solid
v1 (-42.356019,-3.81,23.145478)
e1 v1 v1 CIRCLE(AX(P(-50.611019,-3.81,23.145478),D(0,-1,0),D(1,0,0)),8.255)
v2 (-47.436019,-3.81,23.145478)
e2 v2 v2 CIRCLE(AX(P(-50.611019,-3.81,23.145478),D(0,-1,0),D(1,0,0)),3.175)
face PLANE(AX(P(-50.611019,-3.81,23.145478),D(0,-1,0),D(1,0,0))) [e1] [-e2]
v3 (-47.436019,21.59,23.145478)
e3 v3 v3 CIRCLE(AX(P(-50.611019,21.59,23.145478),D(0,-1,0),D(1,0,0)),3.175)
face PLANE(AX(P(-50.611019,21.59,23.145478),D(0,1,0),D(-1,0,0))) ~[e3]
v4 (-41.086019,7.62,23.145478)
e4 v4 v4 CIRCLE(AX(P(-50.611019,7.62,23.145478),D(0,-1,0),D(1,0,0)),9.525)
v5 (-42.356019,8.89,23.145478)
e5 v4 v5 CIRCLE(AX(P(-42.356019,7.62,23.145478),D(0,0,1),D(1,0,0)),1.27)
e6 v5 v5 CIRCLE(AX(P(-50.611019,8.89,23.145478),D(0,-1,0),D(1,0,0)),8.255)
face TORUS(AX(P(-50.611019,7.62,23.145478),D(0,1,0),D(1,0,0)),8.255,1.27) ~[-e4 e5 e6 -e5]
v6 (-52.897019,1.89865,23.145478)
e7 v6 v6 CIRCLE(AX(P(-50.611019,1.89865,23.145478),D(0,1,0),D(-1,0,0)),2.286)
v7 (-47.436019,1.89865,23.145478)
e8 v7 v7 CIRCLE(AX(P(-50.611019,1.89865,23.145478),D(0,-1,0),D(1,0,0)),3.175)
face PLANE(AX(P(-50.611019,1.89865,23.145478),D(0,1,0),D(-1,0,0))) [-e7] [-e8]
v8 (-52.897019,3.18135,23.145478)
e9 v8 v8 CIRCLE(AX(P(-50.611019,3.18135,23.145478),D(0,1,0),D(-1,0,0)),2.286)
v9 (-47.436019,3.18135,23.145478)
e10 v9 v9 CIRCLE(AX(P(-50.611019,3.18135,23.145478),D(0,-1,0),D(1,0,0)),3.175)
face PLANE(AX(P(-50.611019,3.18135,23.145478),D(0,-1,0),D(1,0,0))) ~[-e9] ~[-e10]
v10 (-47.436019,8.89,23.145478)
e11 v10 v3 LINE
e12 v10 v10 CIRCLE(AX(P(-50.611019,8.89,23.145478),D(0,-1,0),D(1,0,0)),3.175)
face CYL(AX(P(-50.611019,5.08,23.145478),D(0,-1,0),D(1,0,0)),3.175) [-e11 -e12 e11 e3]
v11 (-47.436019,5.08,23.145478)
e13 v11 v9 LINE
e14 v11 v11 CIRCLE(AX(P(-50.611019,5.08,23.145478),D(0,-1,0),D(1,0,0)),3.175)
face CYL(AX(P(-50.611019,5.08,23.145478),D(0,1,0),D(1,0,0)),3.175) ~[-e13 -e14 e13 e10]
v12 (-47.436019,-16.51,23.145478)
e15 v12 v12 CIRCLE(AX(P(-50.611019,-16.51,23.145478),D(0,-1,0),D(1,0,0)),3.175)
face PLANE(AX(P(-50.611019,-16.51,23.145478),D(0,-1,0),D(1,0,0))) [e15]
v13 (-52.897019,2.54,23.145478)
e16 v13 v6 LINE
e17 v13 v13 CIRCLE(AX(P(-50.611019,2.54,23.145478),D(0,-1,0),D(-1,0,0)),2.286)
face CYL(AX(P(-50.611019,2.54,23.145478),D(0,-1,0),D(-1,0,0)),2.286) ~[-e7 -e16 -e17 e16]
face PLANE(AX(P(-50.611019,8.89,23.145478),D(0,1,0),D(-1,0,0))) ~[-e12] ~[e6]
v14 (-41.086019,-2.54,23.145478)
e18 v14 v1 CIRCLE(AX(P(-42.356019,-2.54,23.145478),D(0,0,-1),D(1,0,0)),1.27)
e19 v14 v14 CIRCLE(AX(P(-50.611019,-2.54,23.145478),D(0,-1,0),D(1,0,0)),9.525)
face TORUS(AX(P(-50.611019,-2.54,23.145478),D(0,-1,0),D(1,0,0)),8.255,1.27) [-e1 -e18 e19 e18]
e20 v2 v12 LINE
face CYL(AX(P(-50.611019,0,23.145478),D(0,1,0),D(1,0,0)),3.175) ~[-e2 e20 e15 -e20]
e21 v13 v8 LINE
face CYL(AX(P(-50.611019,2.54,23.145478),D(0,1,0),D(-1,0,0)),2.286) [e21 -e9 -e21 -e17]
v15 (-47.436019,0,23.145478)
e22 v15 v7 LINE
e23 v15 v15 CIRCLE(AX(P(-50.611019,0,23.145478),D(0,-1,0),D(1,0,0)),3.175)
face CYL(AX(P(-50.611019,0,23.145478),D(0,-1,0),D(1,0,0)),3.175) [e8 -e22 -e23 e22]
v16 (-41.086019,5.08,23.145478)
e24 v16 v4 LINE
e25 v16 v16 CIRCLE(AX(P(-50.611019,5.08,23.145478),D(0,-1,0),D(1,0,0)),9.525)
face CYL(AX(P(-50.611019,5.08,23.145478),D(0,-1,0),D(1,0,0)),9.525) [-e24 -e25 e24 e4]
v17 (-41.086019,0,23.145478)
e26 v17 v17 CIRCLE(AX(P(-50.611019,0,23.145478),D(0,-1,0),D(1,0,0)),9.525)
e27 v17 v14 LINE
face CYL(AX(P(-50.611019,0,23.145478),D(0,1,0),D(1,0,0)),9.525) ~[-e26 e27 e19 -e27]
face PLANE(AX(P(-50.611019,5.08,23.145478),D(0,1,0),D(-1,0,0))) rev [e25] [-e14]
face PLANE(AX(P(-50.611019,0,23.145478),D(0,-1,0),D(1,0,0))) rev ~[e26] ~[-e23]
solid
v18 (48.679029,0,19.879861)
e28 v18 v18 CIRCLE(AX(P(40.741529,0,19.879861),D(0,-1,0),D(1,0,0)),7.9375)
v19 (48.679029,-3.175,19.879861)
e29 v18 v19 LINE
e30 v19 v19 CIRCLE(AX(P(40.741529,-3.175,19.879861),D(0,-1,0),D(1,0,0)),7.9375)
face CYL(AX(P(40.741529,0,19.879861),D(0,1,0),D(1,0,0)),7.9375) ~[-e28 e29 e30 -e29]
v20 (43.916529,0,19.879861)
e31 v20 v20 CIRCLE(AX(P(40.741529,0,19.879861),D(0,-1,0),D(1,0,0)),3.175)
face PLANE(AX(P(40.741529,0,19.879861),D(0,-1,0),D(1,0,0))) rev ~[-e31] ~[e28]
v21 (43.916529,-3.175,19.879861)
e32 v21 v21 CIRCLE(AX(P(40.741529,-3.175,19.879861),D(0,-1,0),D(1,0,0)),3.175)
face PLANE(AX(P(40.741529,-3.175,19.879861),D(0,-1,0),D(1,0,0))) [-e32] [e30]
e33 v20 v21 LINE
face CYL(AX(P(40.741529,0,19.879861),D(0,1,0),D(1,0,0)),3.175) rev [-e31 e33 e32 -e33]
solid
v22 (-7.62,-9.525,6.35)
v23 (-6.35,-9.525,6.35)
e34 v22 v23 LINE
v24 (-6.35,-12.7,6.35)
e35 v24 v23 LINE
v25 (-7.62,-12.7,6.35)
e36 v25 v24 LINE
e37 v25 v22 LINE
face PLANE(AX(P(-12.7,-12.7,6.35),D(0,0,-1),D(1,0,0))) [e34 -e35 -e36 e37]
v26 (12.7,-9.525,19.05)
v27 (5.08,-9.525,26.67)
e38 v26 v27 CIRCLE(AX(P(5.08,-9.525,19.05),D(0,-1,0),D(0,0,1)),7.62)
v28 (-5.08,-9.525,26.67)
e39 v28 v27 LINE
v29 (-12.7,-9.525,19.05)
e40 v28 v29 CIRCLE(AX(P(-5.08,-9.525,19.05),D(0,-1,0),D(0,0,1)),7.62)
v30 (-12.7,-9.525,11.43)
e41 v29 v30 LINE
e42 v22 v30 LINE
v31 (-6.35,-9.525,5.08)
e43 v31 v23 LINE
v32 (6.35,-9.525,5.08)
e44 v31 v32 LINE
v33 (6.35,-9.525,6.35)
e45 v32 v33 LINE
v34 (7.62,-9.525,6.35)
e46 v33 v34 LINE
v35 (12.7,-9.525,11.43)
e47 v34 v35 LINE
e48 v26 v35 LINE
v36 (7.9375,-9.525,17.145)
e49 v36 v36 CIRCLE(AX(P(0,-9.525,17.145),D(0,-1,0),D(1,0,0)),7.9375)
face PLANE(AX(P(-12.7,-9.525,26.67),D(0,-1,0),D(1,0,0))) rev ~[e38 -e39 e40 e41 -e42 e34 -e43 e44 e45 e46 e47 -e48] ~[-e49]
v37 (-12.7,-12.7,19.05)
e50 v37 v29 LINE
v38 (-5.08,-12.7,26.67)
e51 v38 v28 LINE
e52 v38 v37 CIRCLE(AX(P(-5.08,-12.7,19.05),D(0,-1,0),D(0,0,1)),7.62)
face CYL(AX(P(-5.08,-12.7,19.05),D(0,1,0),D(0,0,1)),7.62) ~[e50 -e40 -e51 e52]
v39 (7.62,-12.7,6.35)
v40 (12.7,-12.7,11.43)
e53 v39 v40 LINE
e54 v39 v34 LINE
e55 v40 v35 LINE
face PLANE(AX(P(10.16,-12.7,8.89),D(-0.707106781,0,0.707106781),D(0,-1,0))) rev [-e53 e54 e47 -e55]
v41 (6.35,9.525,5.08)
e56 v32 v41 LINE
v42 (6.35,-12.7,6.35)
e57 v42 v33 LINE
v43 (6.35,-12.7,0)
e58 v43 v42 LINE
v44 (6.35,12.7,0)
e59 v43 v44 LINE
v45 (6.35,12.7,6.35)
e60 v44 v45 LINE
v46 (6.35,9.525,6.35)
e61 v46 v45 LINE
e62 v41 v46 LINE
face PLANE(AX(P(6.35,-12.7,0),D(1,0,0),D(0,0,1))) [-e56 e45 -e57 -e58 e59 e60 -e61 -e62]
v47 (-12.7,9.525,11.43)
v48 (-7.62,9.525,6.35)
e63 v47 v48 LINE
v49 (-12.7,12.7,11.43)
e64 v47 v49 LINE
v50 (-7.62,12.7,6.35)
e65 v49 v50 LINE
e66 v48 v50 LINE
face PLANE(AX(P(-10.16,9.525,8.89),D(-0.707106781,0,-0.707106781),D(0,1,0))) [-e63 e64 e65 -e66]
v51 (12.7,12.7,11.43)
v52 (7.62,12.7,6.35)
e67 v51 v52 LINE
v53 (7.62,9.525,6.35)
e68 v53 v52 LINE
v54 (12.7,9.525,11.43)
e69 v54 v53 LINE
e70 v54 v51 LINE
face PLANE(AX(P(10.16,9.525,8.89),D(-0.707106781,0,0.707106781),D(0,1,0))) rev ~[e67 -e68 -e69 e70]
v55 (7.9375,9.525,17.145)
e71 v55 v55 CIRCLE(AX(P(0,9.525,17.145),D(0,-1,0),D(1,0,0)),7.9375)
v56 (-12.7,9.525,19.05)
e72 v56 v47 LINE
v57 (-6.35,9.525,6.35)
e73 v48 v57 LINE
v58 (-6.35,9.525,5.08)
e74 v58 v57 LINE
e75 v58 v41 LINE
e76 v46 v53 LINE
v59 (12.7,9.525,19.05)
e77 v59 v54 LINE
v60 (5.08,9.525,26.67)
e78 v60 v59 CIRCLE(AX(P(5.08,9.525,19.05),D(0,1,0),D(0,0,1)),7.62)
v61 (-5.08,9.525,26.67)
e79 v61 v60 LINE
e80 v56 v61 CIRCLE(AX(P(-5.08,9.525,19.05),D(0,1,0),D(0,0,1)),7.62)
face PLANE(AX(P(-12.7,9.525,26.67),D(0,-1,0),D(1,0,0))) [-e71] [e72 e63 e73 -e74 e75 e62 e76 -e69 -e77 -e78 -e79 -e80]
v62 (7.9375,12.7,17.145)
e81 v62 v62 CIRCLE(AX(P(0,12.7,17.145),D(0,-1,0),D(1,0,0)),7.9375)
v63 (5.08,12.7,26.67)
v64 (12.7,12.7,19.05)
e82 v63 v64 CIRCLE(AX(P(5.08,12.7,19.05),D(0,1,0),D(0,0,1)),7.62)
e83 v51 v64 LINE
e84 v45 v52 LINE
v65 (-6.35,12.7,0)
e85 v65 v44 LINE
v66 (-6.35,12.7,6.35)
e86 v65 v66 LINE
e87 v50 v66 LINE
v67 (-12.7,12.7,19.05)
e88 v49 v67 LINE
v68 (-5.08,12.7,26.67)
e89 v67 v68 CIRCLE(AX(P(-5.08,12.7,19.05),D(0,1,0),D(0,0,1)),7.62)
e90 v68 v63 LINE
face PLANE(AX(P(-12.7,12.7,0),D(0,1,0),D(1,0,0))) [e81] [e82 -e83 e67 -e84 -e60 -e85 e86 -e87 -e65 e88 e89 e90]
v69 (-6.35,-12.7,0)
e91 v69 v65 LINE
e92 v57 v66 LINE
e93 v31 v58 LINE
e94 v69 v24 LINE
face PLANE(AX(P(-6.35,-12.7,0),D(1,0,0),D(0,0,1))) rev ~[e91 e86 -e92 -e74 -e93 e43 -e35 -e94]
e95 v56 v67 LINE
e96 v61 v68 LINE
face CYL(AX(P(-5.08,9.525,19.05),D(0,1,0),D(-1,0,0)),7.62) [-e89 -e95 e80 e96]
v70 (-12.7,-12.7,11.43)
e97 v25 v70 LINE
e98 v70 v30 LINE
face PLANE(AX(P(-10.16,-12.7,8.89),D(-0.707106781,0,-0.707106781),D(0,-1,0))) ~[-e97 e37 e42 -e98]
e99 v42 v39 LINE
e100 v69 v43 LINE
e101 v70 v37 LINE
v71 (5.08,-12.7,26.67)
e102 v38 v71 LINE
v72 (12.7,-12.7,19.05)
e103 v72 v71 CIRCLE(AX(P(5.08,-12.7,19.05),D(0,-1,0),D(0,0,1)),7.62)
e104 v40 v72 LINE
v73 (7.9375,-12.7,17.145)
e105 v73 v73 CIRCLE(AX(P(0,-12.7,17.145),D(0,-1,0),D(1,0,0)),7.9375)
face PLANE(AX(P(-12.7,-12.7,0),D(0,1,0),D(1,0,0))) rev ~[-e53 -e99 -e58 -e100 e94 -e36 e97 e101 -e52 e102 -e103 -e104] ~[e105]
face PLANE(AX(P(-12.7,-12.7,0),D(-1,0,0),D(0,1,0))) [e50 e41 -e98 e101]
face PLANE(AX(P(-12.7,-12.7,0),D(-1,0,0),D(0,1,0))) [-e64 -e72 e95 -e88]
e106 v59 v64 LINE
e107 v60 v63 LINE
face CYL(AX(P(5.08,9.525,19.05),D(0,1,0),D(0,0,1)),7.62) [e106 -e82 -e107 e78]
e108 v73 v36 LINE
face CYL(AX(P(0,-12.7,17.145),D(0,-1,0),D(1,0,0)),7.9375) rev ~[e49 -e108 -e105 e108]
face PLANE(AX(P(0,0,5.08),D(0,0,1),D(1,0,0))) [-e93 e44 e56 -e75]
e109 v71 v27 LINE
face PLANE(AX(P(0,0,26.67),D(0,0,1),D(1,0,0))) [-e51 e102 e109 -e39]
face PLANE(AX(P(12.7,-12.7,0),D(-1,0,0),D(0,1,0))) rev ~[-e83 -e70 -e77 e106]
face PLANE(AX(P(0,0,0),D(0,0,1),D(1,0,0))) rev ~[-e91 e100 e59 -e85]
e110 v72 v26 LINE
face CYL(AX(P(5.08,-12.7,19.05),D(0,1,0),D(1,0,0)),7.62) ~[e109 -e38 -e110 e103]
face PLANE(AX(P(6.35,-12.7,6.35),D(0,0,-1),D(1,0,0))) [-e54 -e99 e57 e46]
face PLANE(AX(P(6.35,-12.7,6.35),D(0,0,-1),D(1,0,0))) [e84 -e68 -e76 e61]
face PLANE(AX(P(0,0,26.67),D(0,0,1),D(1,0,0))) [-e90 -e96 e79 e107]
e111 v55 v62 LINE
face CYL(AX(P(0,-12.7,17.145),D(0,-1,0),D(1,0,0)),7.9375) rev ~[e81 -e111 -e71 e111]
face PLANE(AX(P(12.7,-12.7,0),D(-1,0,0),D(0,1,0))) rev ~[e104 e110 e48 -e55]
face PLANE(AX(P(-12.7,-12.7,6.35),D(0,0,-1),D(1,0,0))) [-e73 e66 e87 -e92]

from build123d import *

# Parameters (mm, degrees)
F0_W      = 25.4
F0_H      = 25.4
F1_DEPTH  = 26.67
F2_W      = 25.4
F2_H      = 19.05
F3_DEPTH  = 21.59
F4_R      = 7.9375
F4_W      = 6.35
F4_H      = 6.35
F5_DEPTH  = 25.4
F6_R      = 7.62
F7_R      = 9.525
F7_R_2    = 3.175
F8_DEPTH  = 3.81
F9_R      = 1.27
F10_DEPTH = 16.51
F11_DEPTH = 2.54
F12_R     = 3.175
F12_R_2   = 2.286
F13_DEPTH = 0.64135
F15_SIZE  = 5.08
F16_R     = 7.9375
F16_R_2   = 3.175
F17_DEPTH = 3.175


with BuildPart() as f1:
    # F0 (on Top) → F1 (new body)
    with BuildSketch(Plane.XY):
        Rectangle(F0_W, F0_H)
    extrude(amount=F1_DEPTH)

    # F2 (on face) → F3 (cut)
    with BuildSketch(Plane.XY.offset(26.67)):
        Rectangle(F2_W, F2_H)
    extrude(amount=-F3_DEPTH, mode=Mode.SUBTRACT)

    # F4 (on face) → F5 (cut)
    with BuildSketch(Plane.XZ.offset(12.7)):
        with Locations((0, 17.145)):
            Circle(F4_R)
        with Locations((-9.525, 3.175)):
            Rectangle(F4_W, F4_H)
        with Locations((9.525, 3.175)):
            Rectangle(F4_W, F4_H)
    extrude(amount=-F5_DEPTH, mode=Mode.SUBTRACT)

    # F6
    f6_edges = [f1.edges().sort_by_distance(p)[0] for p in [
        (12.7, -11.1125, 26.67),
        (-12.7, -11.1125, 26.67),
        (12.7, 11.1125, 26.67),
        (-12.7, 11.1125, 26.67),
    ]]
    fillet(f6_edges, radius=F6_R)

    # F15
    f15_edges = [f1.edges().sort_by_distance(p)[0] for p in [
        (12.7, -11.1125, 6.35),
        (-12.7, -11.1125, 6.35),
        (-12.7, 11.1125, 6.35),
        (12.7, 11.1125, 6.35),
    ]]
    chamfer(f15_edges, length=F15_SIZE)


with BuildPart() as f8:
    # F7 (on Front) → F8 (new body)
    with BuildSketch(Plane.XZ):
        with Locations((-50.6110191345, 23.1454782188)):
            Circle(F7_R)
        with Locations((-50.6110191345, 23.1454782188)):
            Circle(F7_R_2, mode=Mode.SUBTRACT)
    extrude(amount=F8_DEPTH)

    # F9
    f9_edges = [f8.edges().sort_by_distance(p)[0] for p in [
        (-60.136019, -3.81, 23.145478),
    ]]
    fillet(f9_edges, radius=F9_R)

    # F7 (on Front) → F10 (join)
    with BuildSketch(Plane.XZ):
        with Locations((-50.6110191345, 23.1454782188)):
            Circle(F7_R_2)
    extrude(amount=F10_DEPTH)

    # F7 (on Front) → F11 (join)
    with BuildSketch(Plane.XZ):
        with Locations((-50.6110191345, 23.1454782188)):
            Circle(F7_R_2)
    extrude(amount=-F11_DEPTH)

    # F12 (on face) → F13 (cut, symmetric)
    with BuildSketch(Plane(origin=(0, 2.54, 0), x_dir=(-1, 0, 0), z_dir=(0, 1, 0))):
        with Locations((50.6110191345, 23.1454782188)):
            Circle(F12_R)
        with Locations((50.6110191345, 23.1454782188)):
            Circle(F12_R_2, mode=Mode.SUBTRACT)
    extrude(amount=F13_DEPTH, both=True, mode=Mode.SUBTRACT)

    # F14: F8 across face


with BuildPart() as f8_1:
    add(f8.part)
    add(f8.part.mirror(Plane(origin=(-50.6110191345, 2.54, 23.1454782188), x_dir=(1, 0, 0), z_dir=(0, 1, 0))))


with BuildPart() as f17:
    # F16 (on Front) → F17 (new body)
    with BuildSketch(Plane.XZ):
        with Locations((40.7415293157, 19.8798608035)):
            Circle(F16_R)
        with Locations((40.7415293157, 19.8798608035)):
            Circle(F16_R_2, mode=Mode.SUBTRACT)
    extrude(amount=F17_DEPTH)


solid = Compound([f1.part, f8_1.part, f17.part])
